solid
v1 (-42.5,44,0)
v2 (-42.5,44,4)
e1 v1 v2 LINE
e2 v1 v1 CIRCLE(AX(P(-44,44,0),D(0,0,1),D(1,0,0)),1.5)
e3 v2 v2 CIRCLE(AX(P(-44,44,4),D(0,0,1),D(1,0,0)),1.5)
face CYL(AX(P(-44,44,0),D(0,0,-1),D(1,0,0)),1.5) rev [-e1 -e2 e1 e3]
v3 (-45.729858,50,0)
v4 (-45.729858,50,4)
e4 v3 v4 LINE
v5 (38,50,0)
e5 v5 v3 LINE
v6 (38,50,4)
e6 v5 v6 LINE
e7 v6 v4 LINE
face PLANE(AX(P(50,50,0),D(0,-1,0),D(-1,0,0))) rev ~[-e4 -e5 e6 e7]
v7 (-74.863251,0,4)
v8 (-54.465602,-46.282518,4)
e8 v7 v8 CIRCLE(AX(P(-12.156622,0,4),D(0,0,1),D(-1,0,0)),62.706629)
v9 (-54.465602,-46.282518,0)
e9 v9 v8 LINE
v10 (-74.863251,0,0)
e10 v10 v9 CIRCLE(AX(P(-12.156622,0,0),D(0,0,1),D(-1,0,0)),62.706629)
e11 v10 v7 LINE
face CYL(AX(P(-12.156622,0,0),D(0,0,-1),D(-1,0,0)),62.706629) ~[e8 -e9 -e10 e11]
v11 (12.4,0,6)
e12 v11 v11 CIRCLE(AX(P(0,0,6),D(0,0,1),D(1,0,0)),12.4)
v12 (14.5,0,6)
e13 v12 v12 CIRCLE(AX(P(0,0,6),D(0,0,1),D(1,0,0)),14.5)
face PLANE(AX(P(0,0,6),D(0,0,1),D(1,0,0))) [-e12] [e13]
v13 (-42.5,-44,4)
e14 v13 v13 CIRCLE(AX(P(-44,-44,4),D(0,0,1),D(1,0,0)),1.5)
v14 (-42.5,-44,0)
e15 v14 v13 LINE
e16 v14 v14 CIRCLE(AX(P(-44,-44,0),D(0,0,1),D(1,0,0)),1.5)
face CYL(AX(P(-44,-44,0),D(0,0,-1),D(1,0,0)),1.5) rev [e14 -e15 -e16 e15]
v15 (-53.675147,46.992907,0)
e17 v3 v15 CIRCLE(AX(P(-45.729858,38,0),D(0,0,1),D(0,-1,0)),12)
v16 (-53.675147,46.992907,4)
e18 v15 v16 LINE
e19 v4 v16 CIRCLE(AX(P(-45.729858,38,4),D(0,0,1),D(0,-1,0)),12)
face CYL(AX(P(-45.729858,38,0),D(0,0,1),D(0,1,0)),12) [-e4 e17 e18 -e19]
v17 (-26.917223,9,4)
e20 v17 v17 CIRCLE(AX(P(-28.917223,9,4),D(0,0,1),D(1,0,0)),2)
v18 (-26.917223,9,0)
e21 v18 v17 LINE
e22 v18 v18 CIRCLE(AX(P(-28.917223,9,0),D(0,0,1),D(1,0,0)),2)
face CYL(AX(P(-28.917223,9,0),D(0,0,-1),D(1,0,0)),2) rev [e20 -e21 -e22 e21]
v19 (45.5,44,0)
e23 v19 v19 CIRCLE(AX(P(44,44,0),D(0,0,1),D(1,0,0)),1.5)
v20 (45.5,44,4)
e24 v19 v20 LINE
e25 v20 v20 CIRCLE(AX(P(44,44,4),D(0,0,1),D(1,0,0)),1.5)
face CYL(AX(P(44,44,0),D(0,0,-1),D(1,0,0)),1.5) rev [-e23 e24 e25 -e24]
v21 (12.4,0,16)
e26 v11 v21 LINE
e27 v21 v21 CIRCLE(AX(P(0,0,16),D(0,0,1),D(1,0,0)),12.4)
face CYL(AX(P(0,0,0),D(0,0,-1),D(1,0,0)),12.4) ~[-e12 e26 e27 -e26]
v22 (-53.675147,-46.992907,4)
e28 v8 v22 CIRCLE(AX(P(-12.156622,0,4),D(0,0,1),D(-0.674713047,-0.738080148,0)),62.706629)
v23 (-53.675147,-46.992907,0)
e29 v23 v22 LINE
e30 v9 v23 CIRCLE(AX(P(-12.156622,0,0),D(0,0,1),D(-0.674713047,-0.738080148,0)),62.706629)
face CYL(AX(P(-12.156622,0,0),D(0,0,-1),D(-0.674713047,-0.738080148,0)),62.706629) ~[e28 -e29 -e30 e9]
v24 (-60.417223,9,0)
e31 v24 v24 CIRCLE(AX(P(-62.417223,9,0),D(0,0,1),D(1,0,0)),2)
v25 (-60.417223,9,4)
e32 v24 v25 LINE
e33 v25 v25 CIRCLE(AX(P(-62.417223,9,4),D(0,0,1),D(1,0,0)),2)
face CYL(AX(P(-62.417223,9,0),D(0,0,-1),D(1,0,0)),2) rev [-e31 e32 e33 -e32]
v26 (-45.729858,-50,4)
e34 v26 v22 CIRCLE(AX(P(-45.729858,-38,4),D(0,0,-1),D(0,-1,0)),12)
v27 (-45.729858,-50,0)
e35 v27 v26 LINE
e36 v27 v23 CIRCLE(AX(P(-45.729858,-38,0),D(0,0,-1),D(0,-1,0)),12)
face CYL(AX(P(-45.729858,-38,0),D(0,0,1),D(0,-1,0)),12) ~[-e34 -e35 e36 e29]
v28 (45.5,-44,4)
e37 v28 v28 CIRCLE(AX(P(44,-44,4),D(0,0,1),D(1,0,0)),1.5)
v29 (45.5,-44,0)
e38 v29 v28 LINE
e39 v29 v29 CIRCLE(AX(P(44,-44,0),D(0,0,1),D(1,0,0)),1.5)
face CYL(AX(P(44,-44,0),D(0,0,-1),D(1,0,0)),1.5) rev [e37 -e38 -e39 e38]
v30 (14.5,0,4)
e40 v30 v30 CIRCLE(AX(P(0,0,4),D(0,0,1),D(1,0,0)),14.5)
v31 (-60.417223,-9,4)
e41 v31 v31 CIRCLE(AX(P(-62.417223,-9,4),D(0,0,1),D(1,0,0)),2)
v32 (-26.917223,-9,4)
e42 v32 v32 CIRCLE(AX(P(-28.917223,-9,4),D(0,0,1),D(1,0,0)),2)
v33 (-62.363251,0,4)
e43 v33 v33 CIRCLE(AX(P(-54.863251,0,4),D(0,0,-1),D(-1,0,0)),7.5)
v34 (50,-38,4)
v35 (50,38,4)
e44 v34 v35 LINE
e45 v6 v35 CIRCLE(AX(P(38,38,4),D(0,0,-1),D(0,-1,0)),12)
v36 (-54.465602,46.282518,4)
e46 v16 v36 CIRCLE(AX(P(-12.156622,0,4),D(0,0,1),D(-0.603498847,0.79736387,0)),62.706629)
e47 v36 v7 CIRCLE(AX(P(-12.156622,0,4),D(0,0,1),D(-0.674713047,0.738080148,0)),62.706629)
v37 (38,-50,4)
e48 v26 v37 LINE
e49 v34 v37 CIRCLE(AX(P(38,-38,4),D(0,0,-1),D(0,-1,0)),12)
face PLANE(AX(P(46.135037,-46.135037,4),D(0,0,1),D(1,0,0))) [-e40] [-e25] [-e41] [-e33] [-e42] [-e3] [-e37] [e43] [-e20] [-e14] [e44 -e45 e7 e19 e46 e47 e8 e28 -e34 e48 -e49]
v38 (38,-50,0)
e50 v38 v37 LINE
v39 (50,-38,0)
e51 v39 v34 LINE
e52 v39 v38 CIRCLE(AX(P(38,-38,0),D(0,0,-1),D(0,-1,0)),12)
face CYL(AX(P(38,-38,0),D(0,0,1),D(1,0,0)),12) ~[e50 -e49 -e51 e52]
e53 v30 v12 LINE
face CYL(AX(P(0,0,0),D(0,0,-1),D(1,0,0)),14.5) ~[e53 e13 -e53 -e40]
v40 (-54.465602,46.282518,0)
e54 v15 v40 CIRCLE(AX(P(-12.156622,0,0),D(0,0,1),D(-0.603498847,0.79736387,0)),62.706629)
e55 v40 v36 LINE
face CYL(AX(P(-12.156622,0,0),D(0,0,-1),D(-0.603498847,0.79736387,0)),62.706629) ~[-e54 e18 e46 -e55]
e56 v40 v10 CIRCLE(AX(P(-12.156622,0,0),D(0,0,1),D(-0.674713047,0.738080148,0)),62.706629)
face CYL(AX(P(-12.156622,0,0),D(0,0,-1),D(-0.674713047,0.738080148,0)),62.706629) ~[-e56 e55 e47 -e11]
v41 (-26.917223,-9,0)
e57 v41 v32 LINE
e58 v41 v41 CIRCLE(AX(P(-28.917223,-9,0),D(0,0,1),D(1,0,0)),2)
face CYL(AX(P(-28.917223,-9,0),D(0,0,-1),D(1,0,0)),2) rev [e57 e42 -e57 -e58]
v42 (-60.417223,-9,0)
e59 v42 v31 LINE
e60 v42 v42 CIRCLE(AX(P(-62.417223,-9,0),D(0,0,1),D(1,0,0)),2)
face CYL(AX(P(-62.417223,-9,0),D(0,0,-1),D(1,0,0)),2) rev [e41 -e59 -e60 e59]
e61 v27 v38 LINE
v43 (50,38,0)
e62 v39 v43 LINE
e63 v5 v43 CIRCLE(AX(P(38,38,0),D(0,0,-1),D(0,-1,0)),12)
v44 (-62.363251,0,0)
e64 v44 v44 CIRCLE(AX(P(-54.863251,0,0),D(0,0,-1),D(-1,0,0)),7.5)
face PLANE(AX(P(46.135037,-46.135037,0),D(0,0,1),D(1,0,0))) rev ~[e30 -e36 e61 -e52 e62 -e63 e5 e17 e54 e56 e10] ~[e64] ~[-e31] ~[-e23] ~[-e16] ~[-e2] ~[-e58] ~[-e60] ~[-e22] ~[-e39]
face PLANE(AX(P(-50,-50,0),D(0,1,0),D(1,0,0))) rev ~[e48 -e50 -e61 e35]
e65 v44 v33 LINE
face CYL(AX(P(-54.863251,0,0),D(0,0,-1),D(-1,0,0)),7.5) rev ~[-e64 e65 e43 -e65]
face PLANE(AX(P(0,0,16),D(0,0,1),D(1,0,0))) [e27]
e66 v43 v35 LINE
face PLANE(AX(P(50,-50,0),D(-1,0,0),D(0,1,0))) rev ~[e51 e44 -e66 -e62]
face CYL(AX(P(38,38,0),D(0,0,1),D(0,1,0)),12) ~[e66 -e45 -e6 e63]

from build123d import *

# Parameters (mm, degrees)
F0_R     = 1.5
F0_R_2   = 2
F0_R_3   = 14.5
F1_DEPTH = 4
F2_R     = 12
F0_R_4   = 12.4
F3_DEPTH = 6
F4_DEPTH = 16


with BuildPart() as f1:
    # F0 (on Top) → F1 (new body)
    with BuildSketch(Plane.XY):
        with BuildLine():
            Line((40.1261364576, -50), (50, -50))
            Line((50, -50), (50, -40.1261364576))
            ThreePointArc((50, -40.1261364576), (48.5323223277, -39.658202653), (47, -39.5))
            Line((47, -39.5), (47, -47))
            Line((47, -47), (39.5, -47))
            ThreePointArc((39.5, -47), (39.658202653, -48.5323223277), (40.1261364576, -50))
        make_face()
        with BuildLine():
            Line((-40.1261364576, -50), (40.1261364576, -50))
            ThreePointArc((40.1261364576, -50), (39.658202653, -48.5323223277), (39.5, -47))
            Line((39.5, -47), (-39.5, -47))
            ThreePointArc((-39.5, -47), (-39.658202653, -48.5323223277), (-40.1261364576, -50))
        make_face()
        with BuildLine():
            ThreePointArc((47, -39.5), (48.5323223277, -39.658202653), (50, -40.1261364576))
            Line((50, -40.1261364576), (50, 40.1261364576))
            ThreePointArc((50, 40.1261364576), (48.5323223277, 39.658202653), (47, 39.5))
            Line((47, 39.5), (47, -39.5))
        make_face()
        with BuildLine():
            Line((-50, -50), (-40.1261364576, -50))
            ThreePointArc((-40.1261364576, -50), (-39.658202653, -48.5323223277), (-39.5, -47))
            Line((-39.5, -47), (-47, -47))
            Line((-47, -47), (-47, -39.5))
            ThreePointArc((-47, -39.5), (-52.0432569895, -41.4488236438), (-54.4656023889, -46.2825176166))
            ThreePointArc((-54.4656023889, -46.2825176166), (-52.2758824324, -48.1930098751), (-50, -50))
        make_face()
        with BuildLine():
            ThreePointArc((47, -39.5), (41.6966991411, -41.6966991411), (39.5, -47))
            Line((39.5, -47), (47, -47))
            Line((47, -47), (47, -39.5))
        make_face()
        with Locations((44, -44)):
            Circle(F0_R, mode=Mode.SUBTRACT)
        with BuildLine():
            Line((-39.5, -47), (39.5, -47))
            ThreePointArc((39.5, -47), (41.6966991411, -41.6966991411), (47, -39.5))
            Line((47, -39.5), (47, 39.5))
            ThreePointArc((47, 39.5), (41.6966991411, 41.6966991411), (39.5, 47))
            Line((39.5, 47), (-39.5, 47))
            ThreePointArc((-39.5, 47), (-41.6966991411, 41.6966991411), (-47, 39.5))
            Line((-47, 39.5), (-47, -39.5))
            ThreePointArc((-47, -39.5), (-41.6966991411, -41.6966991411), (-39.5, -47))
        make_face()
        with Locations((-28.9172229711, -9)):
            Circle(F0_R_2, mode=Mode.SUBTRACT)
        with Locations((-28.9172229711, 9)):
            Circle(F0_R_2, mode=Mode.SUBTRACT)
        Circle(F0_R_3, mode=Mode.SUBTRACT)
        with BuildLine():
            ThreePointArc((47, 39.5), (48.5323223277, 39.658202653), (50, 40.1261364576))
            Line((50, 40.1261364576), (50, 50))
            Line((50, 50), (40.1261364576, 50))
            ThreePointArc((40.1261364576, 50), (39.658202653, 48.5323223277), (39.5, 47))
            Line((39.5, 47), (47, 47))
            Line((47, 47), (47, 39.5))
        make_face()
        with BuildLine():
            ThreePointArc((-74.8632505062, 0), (-69.5376936802, -25.2890069281), (-54.4656023889, -46.2825176166))
            ThreePointArc((-54.4656023889, -46.2825176166), (-52.0432569895, -41.4488236438), (-47, -39.5))
            Line((-47, -39.5), (-47, 39.5))
            ThreePointArc((-47, 39.5), (-52.0432569895, 41.4488236438), (-54.4656023889, 46.2825176166))
            ThreePointArc((-54.4656023889, 46.2825176166), (-69.5376936802, 25.2890069281), (-74.8632505062, 0))
        make_face()
        with Locations((-62.4172229711, -9)):
            Circle(F0_R_2, mode=Mode.SUBTRACT)
        with Locations((-62.4172229711, 9)):
            Circle(F0_R_2, mode=Mode.SUBTRACT)
        with BuildLine():
            ThreePointArc((-47.3632505062, 0), (-54.8632505062, -7.5), (-62.3632505062, 0))
            ThreePointArc((-62.3632505062, 0), (-54.8632505062, 7.5), (-47.3632505062, 0))
        make_face(mode=Mode.SUBTRACT)
        with BuildLine():
            Line((-47, -47), (-39.5, -47))
            ThreePointArc((-39.5, -47), (-41.6966991411, -41.6966991411), (-47, -39.5))
            Line((-47, -39.5), (-47, -47))
        make_face()
        with Locations((-44, -44)):
            Circle(F0_R, mode=Mode.SUBTRACT)
        with BuildLine():
            ThreePointArc((39.5, 47), (41.6966991411, 41.6966991411), (47, 39.5))
            Line((47, 39.5), (47, 47))
            Line((47, 47), (39.5, 47))
        make_face()
        with Locations((44, 44)):
            Circle(F0_R, mode=Mode.SUBTRACT)
        with BuildLine():
            ThreePointArc((39.5, 47), (39.658202653, 48.5323223277), (40.1261364576, 50))
            Line((40.1261364576, 50), (-40.1261364576, 50))
            ThreePointArc((-40.1261364576, 50), (-39.658202653, 48.5323223277), (-39.5, 47))
            Line((-39.5, 47), (39.5, 47))
        make_face()
        with BuildLine():
            ThreePointArc((-54.4656023889, 46.2825176166), (-52.0432569895, 41.4488236438), (-47, 39.5))
            Line((-47, 39.5), (-47, 47))
            Line((-47, 47), (-39.5, 47))
            ThreePointArc((-39.5, 47), (-39.658202653, 48.5323223277), (-40.1261364576, 50))
            Line((-40.1261364576, 50), (-50, 50))
            ThreePointArc((-50, 50), (-52.2758824324, 48.1930098751), (-54.4656023889, 46.2825176166))
        make_face()
        with BuildLine():
            Line((-47, 47), (-47, 39.5))
            ThreePointArc((-47, 39.5), (-41.6966991411, 41.6966991411), (-39.5, 47))
            Line((-39.5, 47), (-47, 47))
        make_face()
        with Locations((-44, 44)):
            Circle(F0_R, mode=Mode.SUBTRACT)
    extrude(amount=F1_DEPTH)

    # F2
    f2_edges = [f1.edges().sort_by_distance(p)[0] for p in [
        (-50, 50, 2),
        (50, 50, 2),
        (50, -50, 2),
        (-50, -50, 2),
    ]]
    fillet(f2_edges, radius=F2_R)

    # F0 (on Top) → F3 (join)
    with BuildSketch(Plane.XY):
        Circle(F0_R_3)
        Circle(F0_R_4, mode=Mode.SUBTRACT)
    extrude(amount=F3_DEPTH)

    # F0 (on Top) → F4 (join)
    with BuildSketch(Plane.XY):
        Circle(F0_R_4)
    extrude(amount=F4_DEPTH)


solid = f1.part
